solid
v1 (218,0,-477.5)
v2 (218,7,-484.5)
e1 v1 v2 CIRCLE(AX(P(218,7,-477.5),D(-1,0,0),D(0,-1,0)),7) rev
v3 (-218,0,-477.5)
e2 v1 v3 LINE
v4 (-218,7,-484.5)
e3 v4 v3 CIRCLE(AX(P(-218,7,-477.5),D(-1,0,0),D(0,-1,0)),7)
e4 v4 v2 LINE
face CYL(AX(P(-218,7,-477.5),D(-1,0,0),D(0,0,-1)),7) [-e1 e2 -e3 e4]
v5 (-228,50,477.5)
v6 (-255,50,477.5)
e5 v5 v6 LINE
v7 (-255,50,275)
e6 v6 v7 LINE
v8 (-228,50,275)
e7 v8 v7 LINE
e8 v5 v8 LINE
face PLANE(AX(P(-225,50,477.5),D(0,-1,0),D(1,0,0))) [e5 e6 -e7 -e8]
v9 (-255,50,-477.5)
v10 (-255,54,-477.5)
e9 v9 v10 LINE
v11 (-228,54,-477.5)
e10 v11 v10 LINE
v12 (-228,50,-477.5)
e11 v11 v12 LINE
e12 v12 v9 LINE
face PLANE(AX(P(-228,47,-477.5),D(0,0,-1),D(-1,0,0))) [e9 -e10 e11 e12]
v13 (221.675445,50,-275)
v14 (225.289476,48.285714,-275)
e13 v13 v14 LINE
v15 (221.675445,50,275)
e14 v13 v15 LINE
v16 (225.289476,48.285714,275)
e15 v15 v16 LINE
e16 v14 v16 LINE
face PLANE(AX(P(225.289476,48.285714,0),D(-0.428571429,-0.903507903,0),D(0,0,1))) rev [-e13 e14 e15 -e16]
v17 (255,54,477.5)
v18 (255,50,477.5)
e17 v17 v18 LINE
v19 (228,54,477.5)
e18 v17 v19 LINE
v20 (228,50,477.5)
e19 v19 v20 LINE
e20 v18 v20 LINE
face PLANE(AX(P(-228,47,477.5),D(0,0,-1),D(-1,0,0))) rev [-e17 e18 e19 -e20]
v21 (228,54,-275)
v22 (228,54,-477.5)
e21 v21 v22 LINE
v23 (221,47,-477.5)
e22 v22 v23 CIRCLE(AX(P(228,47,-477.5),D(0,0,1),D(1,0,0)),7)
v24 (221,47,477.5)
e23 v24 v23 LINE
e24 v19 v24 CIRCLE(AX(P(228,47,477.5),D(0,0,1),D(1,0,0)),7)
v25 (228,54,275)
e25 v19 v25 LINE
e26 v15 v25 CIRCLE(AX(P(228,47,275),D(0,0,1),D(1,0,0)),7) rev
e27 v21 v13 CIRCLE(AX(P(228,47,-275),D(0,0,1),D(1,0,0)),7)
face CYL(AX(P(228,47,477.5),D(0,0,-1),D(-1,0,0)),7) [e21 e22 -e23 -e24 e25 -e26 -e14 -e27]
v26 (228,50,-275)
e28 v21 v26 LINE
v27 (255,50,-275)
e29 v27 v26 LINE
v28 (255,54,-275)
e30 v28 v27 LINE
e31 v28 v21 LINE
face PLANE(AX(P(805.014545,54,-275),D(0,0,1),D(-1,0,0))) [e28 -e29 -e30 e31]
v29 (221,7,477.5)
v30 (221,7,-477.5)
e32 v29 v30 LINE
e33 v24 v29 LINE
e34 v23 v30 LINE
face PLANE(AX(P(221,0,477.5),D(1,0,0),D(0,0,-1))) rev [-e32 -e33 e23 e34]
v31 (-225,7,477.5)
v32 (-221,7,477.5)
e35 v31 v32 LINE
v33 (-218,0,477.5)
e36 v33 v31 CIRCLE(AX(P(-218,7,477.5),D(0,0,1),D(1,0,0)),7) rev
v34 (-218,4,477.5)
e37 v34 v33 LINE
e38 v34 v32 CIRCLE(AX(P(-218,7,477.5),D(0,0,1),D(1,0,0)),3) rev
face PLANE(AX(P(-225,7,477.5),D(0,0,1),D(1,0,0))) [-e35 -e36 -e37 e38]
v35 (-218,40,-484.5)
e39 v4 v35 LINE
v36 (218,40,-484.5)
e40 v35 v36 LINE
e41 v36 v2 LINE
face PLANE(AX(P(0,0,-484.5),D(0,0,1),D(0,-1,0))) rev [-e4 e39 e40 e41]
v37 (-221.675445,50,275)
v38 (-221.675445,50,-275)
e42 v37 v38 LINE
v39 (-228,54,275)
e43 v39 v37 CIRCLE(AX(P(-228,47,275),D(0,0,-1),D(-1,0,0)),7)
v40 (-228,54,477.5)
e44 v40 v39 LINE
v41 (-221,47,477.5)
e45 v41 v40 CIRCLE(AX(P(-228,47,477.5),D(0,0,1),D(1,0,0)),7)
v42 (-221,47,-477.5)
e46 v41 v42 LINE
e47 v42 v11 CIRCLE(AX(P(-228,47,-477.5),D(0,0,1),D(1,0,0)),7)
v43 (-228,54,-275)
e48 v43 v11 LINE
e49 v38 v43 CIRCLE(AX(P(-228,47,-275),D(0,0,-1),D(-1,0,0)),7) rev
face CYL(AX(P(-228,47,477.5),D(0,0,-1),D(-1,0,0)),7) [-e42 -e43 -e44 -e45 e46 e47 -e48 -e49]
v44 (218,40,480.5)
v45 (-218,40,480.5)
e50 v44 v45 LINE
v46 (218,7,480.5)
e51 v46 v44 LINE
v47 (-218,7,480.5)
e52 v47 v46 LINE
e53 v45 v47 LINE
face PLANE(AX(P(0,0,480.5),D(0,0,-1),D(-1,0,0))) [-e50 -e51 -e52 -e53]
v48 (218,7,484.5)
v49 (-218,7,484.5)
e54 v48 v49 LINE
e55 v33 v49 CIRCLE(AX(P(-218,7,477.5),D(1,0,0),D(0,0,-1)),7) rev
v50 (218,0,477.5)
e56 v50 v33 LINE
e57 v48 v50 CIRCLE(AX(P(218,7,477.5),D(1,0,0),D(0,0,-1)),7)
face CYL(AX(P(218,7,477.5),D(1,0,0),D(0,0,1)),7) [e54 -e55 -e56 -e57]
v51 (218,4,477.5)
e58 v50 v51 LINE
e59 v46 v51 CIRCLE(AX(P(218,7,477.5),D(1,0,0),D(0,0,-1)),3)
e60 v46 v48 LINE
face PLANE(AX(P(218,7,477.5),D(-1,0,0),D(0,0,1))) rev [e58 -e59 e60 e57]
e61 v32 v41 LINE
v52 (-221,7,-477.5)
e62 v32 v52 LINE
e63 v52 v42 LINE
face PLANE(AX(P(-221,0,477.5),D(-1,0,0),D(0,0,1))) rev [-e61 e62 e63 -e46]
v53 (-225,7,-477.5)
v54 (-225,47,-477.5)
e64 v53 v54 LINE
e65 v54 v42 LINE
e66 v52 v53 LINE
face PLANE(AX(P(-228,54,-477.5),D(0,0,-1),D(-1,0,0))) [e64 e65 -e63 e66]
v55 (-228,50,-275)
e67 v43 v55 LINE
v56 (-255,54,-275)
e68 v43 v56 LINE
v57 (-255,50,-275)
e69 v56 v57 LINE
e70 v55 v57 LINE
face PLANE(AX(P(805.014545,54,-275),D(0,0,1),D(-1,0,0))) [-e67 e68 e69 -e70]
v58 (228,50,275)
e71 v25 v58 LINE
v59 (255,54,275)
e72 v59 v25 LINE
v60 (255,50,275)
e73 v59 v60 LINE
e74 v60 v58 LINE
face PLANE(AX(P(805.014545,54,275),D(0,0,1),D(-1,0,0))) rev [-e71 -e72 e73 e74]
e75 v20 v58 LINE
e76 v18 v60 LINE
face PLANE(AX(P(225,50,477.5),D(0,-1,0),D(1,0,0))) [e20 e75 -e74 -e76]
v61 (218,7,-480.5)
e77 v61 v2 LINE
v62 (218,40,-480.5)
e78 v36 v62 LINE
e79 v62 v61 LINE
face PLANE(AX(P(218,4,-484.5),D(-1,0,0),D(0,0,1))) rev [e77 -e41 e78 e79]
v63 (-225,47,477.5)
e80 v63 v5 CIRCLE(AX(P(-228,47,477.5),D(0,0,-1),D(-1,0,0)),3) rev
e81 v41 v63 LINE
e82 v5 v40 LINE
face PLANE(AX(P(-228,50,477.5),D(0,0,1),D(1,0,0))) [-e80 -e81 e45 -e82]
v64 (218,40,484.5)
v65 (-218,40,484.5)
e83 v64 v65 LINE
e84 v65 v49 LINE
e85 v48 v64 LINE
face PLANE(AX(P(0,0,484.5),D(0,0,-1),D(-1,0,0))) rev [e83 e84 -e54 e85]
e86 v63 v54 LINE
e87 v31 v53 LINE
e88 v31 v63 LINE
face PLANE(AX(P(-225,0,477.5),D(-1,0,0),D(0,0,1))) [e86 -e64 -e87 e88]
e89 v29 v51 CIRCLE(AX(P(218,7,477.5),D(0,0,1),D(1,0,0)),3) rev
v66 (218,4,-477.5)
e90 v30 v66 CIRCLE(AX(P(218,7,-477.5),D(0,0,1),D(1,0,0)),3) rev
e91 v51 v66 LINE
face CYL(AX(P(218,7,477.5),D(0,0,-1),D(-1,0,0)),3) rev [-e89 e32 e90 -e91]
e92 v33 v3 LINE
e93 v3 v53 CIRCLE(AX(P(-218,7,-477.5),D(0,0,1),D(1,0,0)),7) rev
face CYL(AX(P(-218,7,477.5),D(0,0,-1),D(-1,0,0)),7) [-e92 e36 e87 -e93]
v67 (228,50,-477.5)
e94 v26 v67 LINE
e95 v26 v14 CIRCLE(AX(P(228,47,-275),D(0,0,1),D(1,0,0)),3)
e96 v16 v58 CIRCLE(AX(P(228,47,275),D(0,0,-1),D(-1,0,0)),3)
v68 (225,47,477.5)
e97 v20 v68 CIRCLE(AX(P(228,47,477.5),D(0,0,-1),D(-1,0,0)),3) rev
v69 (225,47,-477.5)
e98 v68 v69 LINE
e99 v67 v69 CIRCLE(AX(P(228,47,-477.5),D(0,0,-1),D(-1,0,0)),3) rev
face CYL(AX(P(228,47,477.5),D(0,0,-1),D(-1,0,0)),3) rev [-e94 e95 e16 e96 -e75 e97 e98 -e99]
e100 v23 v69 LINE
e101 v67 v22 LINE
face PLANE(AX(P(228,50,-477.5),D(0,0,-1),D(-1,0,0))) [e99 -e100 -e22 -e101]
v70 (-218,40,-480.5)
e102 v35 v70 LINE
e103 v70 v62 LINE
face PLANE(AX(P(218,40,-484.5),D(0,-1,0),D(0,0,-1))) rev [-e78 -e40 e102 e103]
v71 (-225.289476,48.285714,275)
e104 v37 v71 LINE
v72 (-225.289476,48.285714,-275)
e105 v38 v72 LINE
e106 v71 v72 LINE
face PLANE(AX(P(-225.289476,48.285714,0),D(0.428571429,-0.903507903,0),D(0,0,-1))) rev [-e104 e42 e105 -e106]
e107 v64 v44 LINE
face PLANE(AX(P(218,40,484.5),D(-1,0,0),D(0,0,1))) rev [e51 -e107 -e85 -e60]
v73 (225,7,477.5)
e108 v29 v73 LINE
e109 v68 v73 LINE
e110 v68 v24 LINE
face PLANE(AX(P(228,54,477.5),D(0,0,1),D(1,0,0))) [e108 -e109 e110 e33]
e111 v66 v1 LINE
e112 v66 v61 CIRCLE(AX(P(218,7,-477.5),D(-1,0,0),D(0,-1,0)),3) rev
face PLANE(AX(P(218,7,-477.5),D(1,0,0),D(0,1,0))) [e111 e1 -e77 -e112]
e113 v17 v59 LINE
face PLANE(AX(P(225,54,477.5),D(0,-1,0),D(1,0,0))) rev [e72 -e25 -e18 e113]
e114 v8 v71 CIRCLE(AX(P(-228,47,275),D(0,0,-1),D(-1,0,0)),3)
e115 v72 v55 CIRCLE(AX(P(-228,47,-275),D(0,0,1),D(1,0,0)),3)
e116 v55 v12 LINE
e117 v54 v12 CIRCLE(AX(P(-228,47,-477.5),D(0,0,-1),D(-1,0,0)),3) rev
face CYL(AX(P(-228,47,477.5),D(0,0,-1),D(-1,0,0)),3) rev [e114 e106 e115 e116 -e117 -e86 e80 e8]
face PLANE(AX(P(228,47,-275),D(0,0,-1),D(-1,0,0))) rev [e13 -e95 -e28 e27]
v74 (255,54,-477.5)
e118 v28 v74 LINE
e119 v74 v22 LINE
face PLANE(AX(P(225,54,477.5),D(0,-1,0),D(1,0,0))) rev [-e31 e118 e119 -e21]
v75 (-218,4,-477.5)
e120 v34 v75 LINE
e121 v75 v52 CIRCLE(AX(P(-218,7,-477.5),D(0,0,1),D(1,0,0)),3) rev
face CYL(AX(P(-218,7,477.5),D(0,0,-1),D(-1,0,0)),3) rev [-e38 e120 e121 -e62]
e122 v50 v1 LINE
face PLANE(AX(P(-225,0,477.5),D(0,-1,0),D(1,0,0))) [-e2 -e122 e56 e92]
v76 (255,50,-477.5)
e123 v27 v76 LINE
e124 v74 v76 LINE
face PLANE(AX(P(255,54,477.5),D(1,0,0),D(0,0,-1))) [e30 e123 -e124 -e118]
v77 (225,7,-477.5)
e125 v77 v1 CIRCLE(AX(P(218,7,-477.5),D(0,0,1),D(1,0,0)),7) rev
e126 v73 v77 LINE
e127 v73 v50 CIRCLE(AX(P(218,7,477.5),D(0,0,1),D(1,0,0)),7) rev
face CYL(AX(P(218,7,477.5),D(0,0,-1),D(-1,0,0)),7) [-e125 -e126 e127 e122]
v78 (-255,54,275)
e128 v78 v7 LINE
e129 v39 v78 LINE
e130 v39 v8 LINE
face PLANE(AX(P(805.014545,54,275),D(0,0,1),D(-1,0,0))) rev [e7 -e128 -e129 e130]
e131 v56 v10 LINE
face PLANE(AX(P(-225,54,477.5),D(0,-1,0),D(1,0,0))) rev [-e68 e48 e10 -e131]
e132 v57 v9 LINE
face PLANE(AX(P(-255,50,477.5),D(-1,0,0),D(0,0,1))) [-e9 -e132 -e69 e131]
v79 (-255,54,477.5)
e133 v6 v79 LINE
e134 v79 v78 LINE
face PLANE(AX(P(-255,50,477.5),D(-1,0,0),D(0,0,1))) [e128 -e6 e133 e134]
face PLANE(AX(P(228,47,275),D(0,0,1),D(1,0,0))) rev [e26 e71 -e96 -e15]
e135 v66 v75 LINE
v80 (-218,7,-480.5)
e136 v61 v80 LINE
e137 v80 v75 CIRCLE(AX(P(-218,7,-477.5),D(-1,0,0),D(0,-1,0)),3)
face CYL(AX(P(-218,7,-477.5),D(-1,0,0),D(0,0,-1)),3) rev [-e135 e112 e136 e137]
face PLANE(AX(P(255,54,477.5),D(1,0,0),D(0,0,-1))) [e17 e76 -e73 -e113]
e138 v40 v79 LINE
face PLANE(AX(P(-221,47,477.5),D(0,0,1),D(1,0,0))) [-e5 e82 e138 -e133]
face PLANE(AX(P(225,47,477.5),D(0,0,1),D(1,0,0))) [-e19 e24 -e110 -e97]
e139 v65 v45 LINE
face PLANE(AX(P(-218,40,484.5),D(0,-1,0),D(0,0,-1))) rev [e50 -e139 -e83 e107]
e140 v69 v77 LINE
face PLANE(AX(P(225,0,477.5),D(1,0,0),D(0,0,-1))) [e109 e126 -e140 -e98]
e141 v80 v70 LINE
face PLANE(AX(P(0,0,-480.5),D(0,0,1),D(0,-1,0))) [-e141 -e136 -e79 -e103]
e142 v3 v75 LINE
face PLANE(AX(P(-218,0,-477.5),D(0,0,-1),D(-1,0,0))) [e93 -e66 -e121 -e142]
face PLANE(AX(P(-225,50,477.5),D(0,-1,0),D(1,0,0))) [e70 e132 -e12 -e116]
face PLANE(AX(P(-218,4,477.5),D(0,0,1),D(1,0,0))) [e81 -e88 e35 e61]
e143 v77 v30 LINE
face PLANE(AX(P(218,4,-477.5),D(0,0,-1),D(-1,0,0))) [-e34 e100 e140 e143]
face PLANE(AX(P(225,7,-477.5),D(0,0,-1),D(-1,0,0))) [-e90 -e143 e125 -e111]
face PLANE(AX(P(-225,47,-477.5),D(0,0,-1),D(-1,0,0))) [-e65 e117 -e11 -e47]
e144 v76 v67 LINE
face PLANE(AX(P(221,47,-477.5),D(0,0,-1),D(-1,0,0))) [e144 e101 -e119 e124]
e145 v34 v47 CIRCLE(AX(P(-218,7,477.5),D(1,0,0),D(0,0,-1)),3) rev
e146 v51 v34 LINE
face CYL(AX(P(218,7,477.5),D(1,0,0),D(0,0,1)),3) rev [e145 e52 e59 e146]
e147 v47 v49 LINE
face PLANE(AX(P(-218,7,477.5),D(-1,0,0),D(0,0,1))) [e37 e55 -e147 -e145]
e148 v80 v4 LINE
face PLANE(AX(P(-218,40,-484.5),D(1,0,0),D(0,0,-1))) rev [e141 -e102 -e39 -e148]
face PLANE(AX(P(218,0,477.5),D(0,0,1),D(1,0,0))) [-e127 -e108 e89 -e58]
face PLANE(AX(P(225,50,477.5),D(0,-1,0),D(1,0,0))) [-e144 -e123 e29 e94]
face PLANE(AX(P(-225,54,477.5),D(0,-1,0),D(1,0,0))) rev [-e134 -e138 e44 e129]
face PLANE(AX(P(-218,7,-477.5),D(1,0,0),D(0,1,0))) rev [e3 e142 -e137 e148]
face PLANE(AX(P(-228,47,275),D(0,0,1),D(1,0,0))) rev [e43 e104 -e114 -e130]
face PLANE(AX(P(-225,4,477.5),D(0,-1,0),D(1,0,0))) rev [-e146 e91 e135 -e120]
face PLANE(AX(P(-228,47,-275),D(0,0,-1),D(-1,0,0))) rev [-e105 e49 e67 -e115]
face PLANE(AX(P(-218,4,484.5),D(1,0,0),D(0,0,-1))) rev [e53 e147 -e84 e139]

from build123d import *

# Parameters (mm, degrees)
BASE_FLANGIA1_DEPTH       = 477.5
BORDO_FLANGIA1_DEPTH      = 436
BORDO_FLANGIA1_BEND_DEPTH = 436
TAGLIO_ESTRUSIONE2_START  = -275
TAGLIO_ESTRUSIONE2_DEPTH  = 550


# Read off the part's stored shape, not the designer's step: Taglio-Estrusione2
# Sheet-metal steps are written as plain solids
with BuildPart() as part:
    # Schizzo1 → Base-Flangia1 (new, symmetric)
    with BuildSketch(Plane.XY):
        with BuildLine():
            Line((-255, 50), (-228, 50))
            ThreePointArc((-228, 50), (-225.878679656, 49.121320344), (-225, 47))
            Line((-225, 47), (-225, 7))
            ThreePointArc((-225, 7), (-222.949747468, 2.050252532), (-218, 0))
            Line((-218, 0), (218, 0))
            ThreePointArc((218, 0), (222.949747468, 2.050252532), (225, 7))
            Line((225, 7), (225, 47))
            ThreePointArc((225, 47), (225.878679656, 49.121320344), (228, 50))
            Line((228, 50), (255, 50))
            Line((255, 50), (255, 54))
            Line((255, 54), (228, 54))
            ThreePointArc((228, 54), (223.050252532, 51.949747468), (221, 47))
            Line((221, 47), (221, 7))
            ThreePointArc((221, 7), (220.121320344, 4.878679656), (218, 4))
            Line((218, 4), (-218, 4))
            ThreePointArc((-218, 4), (-220.121320344, 4.878679656), (-221, 7))
            Line((-221, 7), (-221, 47))
            ThreePointArc((-221, 47), (-223.050252532, 51.949747468), (-228, 54))
            Line((-228, 54), (-255, 54))
            Line((-255, 54), (-255, 50))
        make_face()
    extrude(amount=BASE_FLANGIA1_DEPTH, both=True)

    # Bordo-Flangia1 section (across the edge) → Bordo-Flangia1 (add)
    with BuildSketch(Plane(origin=(-218, 4, 480.5), x_dir=(0, 0, -1), z_dir=(1, 0, 0))):
        with BuildLine():
            Line((-4, 3), (-4, 36))
            Line((-4, 36), (0, 36))
            Line((0, 36), (0, 3))
            ThreePointArc((0, 3), (0.878679656, 0.878679656), (3, 0))
            Line((3, 0), (3, -4))
            ThreePointArc((3, -4), (-1.949747468, -1.949747468), (-4, 3))
        make_face()
    extrude(amount=BORDO_FLANGIA1_DEPTH)

    # Bordo-Flangia1 section 2 (across the edge) → Bordo-Flangia1 bend (add)
    with BuildSketch(Plane(origin=(218, 4, -480.5), x_dir=(0, 0, 1), z_dir=(-1, 0, 0))):
        with BuildLine():
            Line((-4, 3), (-4, 36))
            Line((-4, 36), (0, 36))
            Line((0, 36), (0, 3))
            ThreePointArc((0, 3), (0.878679656, 0.878679656), (3, 0))
            Line((3, 0), (3, -4))
            ThreePointArc((3, -4), (-1.949747468, -1.949747468), (-4, 3))
        make_face()
    extrude(amount=BORDO_FLANGIA1_BEND_DEPTH)

    # Taglio-Estrusione2 outline → Taglio-Estrusione2 (cut)
    with BuildSketch(Plane.XY.offset(TAGLIO_ESTRUSIONE2_START)):
        with BuildLine():
            ThreePointArc((-228, 50), (-226.396432548, 49.535462765), (-225.289476291, 48.285714286))
            Line((-225.289476291, 48.285714286), (-221.67544468, 50))
            ThreePointArc((-221.67544468, 50), (-224.258342614, 52.916079783), (-228, 54))
            Line((-228, 54), (-255, 54))
            Line((-255, 54), (-255, 50))
            Line((-255, 50), (-228, 50))
        make_face()
        with BuildLine():
            ThreePointArc((228, 54), (224.258342614, 52.916079783), (221.67544468, 50))
            Line((221.67544468, 50), (225.289476291, 48.285714286))
            ThreePointArc((225.289476291, 48.285714286), (226.396432548, 49.535462765), (228, 50))
            Line((228, 50), (255, 50))
            Line((255, 50), (255, 54))
            Line((255, 54), (228, 54))
        make_face()
    extrude(amount=TAGLIO_ESTRUSIONE2_DEPTH, mode=Mode.SUBTRACT)


solid = part.part
